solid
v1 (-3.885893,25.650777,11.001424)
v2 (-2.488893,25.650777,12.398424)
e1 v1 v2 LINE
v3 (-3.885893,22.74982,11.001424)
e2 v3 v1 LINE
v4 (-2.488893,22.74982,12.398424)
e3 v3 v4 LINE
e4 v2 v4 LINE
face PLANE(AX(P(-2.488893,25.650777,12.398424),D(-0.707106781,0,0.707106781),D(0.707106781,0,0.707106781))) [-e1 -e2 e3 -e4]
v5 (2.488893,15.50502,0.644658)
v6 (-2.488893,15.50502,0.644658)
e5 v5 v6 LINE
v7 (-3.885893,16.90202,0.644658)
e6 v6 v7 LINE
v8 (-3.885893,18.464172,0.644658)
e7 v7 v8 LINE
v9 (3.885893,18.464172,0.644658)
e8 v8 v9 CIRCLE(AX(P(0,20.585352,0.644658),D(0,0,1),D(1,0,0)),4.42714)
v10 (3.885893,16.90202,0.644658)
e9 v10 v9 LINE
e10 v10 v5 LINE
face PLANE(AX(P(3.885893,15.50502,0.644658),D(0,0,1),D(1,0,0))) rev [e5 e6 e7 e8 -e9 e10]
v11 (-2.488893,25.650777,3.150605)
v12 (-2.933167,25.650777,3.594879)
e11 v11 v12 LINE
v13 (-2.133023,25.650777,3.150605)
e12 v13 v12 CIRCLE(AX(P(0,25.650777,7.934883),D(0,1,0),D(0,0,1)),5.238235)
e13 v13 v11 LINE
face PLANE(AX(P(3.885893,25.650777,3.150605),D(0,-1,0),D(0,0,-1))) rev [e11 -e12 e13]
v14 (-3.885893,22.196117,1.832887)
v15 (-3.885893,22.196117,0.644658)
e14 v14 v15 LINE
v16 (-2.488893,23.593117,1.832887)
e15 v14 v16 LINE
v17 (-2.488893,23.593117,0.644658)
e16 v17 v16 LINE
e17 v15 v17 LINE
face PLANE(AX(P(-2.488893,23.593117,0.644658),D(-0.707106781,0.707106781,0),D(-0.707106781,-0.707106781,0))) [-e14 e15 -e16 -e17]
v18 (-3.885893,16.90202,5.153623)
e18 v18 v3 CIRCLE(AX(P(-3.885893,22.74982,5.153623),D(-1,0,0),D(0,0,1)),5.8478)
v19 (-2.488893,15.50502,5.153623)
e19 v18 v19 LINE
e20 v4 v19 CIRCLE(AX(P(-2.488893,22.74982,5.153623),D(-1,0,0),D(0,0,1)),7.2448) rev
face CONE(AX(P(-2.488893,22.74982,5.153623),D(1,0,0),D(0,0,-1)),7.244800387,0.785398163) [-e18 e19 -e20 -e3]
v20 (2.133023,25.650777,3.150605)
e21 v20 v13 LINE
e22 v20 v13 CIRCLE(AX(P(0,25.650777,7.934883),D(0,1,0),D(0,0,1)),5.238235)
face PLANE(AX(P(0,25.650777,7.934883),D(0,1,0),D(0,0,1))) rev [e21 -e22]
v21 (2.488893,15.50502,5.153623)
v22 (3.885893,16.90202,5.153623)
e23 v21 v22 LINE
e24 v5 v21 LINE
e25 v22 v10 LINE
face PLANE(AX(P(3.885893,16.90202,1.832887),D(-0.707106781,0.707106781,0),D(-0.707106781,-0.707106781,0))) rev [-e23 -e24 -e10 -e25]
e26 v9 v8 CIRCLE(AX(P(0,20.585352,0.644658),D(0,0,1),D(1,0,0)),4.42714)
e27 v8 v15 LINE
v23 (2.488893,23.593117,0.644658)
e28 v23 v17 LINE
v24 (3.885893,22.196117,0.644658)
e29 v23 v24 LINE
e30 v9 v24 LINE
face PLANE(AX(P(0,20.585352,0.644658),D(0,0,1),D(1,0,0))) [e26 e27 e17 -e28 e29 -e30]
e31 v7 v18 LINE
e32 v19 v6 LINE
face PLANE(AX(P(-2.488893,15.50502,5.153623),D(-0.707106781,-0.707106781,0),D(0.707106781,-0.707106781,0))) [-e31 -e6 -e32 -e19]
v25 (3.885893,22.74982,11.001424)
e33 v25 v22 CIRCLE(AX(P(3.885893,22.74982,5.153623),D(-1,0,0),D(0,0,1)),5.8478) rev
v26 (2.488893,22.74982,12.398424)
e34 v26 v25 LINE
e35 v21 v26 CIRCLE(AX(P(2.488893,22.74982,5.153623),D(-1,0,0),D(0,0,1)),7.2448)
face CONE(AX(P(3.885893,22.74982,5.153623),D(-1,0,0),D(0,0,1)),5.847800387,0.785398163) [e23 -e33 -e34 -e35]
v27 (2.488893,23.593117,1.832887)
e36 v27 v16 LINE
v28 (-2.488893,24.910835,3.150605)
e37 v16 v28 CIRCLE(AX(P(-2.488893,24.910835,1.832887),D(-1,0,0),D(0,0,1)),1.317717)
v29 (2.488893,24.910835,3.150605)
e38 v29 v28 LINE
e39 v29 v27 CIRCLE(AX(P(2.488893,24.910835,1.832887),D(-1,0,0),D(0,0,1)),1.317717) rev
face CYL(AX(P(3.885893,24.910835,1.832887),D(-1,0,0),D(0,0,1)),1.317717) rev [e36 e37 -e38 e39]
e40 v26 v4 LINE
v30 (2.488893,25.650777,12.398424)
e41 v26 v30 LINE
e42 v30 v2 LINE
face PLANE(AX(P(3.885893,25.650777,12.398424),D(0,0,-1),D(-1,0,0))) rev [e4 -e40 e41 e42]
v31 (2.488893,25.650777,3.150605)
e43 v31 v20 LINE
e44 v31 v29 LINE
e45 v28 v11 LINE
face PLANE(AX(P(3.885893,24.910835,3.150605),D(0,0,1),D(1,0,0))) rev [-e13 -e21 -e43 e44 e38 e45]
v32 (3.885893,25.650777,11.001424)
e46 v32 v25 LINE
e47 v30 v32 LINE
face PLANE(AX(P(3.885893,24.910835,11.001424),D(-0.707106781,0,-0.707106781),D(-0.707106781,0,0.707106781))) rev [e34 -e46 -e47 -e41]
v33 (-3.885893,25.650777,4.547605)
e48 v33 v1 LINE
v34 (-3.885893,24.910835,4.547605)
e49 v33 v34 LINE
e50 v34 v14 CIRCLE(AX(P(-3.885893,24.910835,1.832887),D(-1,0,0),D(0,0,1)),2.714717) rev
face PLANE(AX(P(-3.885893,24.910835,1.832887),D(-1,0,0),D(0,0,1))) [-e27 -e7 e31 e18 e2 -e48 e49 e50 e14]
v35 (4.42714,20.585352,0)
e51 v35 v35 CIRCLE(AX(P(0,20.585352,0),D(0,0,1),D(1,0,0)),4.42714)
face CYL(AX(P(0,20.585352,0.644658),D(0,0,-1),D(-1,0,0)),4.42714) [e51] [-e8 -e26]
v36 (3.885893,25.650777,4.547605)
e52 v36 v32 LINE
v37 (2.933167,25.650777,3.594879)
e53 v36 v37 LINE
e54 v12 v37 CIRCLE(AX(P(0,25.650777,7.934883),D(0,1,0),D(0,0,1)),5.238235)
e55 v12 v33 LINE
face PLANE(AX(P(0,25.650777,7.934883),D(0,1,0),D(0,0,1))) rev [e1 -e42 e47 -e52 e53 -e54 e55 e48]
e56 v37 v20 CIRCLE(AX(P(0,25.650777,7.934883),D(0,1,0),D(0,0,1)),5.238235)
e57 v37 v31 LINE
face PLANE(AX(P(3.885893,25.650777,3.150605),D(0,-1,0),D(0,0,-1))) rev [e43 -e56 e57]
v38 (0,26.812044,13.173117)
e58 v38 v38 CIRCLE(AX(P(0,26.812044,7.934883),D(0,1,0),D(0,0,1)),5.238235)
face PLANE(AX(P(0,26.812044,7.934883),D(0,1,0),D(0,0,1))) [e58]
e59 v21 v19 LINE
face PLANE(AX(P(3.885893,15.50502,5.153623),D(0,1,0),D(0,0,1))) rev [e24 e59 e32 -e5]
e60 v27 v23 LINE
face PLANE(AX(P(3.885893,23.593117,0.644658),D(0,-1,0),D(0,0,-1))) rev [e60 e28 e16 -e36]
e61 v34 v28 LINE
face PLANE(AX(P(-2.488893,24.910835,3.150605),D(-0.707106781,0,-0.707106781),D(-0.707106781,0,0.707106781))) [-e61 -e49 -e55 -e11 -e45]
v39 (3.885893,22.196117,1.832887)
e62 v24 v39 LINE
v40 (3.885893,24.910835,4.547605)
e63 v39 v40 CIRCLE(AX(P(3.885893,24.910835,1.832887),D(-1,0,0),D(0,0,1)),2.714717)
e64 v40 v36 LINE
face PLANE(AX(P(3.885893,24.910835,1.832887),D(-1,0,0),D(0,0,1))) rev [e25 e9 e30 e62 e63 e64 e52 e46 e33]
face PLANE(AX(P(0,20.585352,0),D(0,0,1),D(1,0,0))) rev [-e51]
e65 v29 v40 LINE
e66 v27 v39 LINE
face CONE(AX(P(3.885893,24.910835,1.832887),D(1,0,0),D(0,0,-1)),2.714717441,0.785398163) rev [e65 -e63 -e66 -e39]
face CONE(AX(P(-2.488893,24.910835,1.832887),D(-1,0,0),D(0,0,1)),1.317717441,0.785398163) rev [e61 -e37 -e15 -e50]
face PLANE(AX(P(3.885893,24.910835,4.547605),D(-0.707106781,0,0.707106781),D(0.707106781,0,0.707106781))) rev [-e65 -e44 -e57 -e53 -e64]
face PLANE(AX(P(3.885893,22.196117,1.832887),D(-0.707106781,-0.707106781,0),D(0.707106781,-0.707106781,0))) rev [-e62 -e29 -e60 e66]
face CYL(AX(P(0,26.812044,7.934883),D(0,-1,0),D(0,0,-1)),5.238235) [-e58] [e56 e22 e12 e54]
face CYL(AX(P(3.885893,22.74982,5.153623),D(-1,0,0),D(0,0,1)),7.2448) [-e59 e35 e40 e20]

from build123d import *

# Parameters (mm, degrees)
SKETCH1_R      = 4.427139884
EXTRUDE1_DEPTH = 0.644658235
EXTRUDE2_DEPTH = 3.885892792
SKETCH3_R      = 5.238234522
EXTRUDE3_DEPTH = 1.161266807
CHAMFER1_SIZE  = 1.397


with BuildPart() as part:
    # Sketch1 → Extrude1 (new body)
    with BuildSketch(Plane.XY):
        with Locations((0, 20.585351579)):
            Circle(SKETCH1_R)
    extrude(amount=EXTRUDE1_DEPTH)

    # Sketch2 → Extrude2 (add, symmetric)
    with BuildSketch(Plane(origin=(0, 0, 0), x_dir=(0, 0, -1), z_dir=(1, 0, 0))):
        with BuildLine():
            Line((-0.644658235, 15.505020105), (-0.644658235, 23.59311727))
            Line((-0.644658235, 23.59311727), (-1.832887116, 23.59311727))
            ThreePointArc((-1.832887116, 23.59311727), (-2.764654054, 23.979067772), (-3.150604557, 24.910834711))
            Line((-3.150604557, 24.910834711), (-3.150604557, 25.650777017))
            Line((-3.150604557, 25.650777017), (-12.398423576, 25.650777017))
            Line((-12.398423576, 25.650777017), (-12.398423576, 22.749820493))
            ThreePointArc((-12.398423576, 22.749820493), (-10.27647067, 17.62697301), (-5.153623188, 15.505020105))
            Line((-5.153623188, 15.505020105), (-0.644658235, 15.505020105))
        make_face()
    extrude(amount=EXTRUDE2_DEPTH, both=True)

    # Sketch3 → Extrude3 (add)
    with BuildSketch(Plane(origin=(0, 25.650777017, 0), x_dir=(1, 0, 0), z_dir=(0, 1, 0))):
        with Locations(Location((0, -7.934882504, 0), (0, 0, 65.970774096))):
            Circle(SKETCH3_R)
    extrude(amount=EXTRUDE3_DEPTH)

    # Chamfer1
    # the kernel refuses this chamfer: 1.397 mm, written as the material it takes off along each edge
    with BuildSketch(Plane(origin=(-3.885892792, 24.910834711, 1.832887116), x_dir=(0, -1, 0), z_dir=(0, 0, -1))) as chamfer1_piece_1:
        Polygon((1.317717441 + CHAMFER1_SIZE, 0), (1.317717441, -CHAMFER1_SIZE), (1.317717441, 0), align=None)
    revolve(axis=Axis((-3.885892792, 24.910834711, 1.832887116), (-1, 0, 0)), revolution_arc=90, mode=Mode.SUBTRACT)
    with BuildSketch(Plane(origin=(-3.885892792, 24.910834711, 3.150604557), x_dir=(-0.027495876610586344, 0, 0.9996219169112966), z_dir=(0, 1, 0))) as chamfer1_piece_2:
        Polygon((CHAMFER1_SIZE * 0.999621916911, CHAMFER1_SIZE * 0.0274958766106), (-CHAMFER1_SIZE * 0.0274958766106, CHAMFER1_SIZE * 0.999621916911), (0, 0), align=None)
    extrude(amount=0.739942306, mode=Mode.SUBTRACT)
    with BuildSketch(Plane(origin=(-3.885892792, 25.650777017, 12.398423576), x_dir=(-0.027495876610586365, 0, -0.9996219169112968), z_dir=(0, -1, 0))) as chamfer1_piece_3:
        Polygon((CHAMFER1_SIZE * 0.999621916911, CHAMFER1_SIZE * 0.0274958766106), (-CHAMFER1_SIZE * 0.0274958766106, CHAMFER1_SIZE * 0.999621916911), (0, 0), align=None)
    extrude(amount=2.900956524, mode=Mode.SUBTRACT)
    with BuildSketch(Plane(origin=(-3.885892792, 22.749820493, 5.153623188), x_dir=(0, 0, 1), z_dir=(0, 1, 0))) as chamfer1_piece_4:
        Polygon((7.244800387 - CHAMFER1_SIZE, 0), (7.244800387, CHAMFER1_SIZE), (7.244800387, 0), align=None)
    revolve(axis=Axis((-3.885892792, 22.749820493, 5.153623188), (1, 0, 0)), revolution_arc=90, mode=Mode.SUBTRACT)
    with BuildSketch(Plane(origin=(3.885892792, 15.505020105, 5.153623188), x_dir=(0.027495876610586393, 0.9996219169112966, 0), z_dir=(0, 0, -1)), Plane(origin=(-3.885892792, 15.505020105, 5.153623188), x_dir=(0.9996219169112968, -0.027495876610586046, 0), z_dir=(0, 0, -1))) as chamfer1_piece_5:
        Polygon((CHAMFER1_SIZE * 0.999621916911, -CHAMFER1_SIZE * 0.0274958766106), (-CHAMFER1_SIZE * 0.0274958766106, -CHAMFER1_SIZE * 0.999621916911), (0, 0), align=None)
    extrude(amount=8.101606087, mode=Mode.SUBTRACT)
    with BuildSketch(Plane(origin=(3.885892792, 23.59311727, 0.644658235), x_dir=(0.027495876610586393, -0.9996219169112966, 0), z_dir=(0, 0, 1))) as chamfer1_piece_6:
        Polygon((CHAMFER1_SIZE * 0.999621916911, -CHAMFER1_SIZE * 0.0274958766106), (-CHAMFER1_SIZE * 0.0274958766106, -CHAMFER1_SIZE * 0.999621916911), (0, 0), align=None)
    extrude(amount=1.188228881, mode=Mode.SUBTRACT)
    with BuildSketch(Plane(origin=(3.885892792, 24.910834711, 1.832887116), x_dir=(0, -1, 0), z_dir=(0, 0, -1))) as chamfer1_piece_7:
        Polygon((1.317717441 + CHAMFER1_SIZE, 0), (1.317717441, CHAMFER1_SIZE), (1.317717441, 0), align=None)
    revolve(axis=Axis((3.885892792, 24.910834711, 1.832887116), (-1, 0, 0)), revolution_arc=90, mode=Mode.SUBTRACT)
    with BuildSketch(Plane(origin=(3.885892792, 24.910834711, 3.150604557), x_dir=(0.027495876610586344, 0, 0.9996219169112966), z_dir=(0, 1, 0))) as chamfer1_piece_8:
        Polygon((CHAMFER1_SIZE * 0.999621916911, -CHAMFER1_SIZE * 0.0274958766106), (-CHAMFER1_SIZE * 0.0274958766106, -CHAMFER1_SIZE * 0.999621916911), (0, 0), align=None)
    extrude(amount=0.739942306, mode=Mode.SUBTRACT)
    with BuildSketch(Plane(origin=(3.885892792, 25.650777017, 12.398423576), x_dir=(0.027495876610586365, 0, -0.9996219169112968), z_dir=(0, -1, 0))) as chamfer1_piece_9:
        Polygon((CHAMFER1_SIZE * 0.999621916911, -CHAMFER1_SIZE * 0.0274958766106), (-CHAMFER1_SIZE * 0.0274958766106, -CHAMFER1_SIZE * 0.999621916911), (0, 0), align=None)
    extrude(amount=2.900956524, mode=Mode.SUBTRACT)
    with BuildSketch(Plane(origin=(3.885892792, 22.749820493, 5.153623188), x_dir=(0, 0, 1), z_dir=(0, 1, 0))) as chamfer1_piece_10:
        Polygon((7.244800387 - CHAMFER1_SIZE, 0), (7.244800387, -CHAMFER1_SIZE), (7.244800387, 0), align=None)
    revolve(axis=Axis((3.885892792, 22.749820493, 5.153623188), (1, 0, 0)), revolution_arc=90, mode=Mode.SUBTRACT)
    with BuildSketch(Plane(origin=(-3.885892792, 23.59311727, 0.644658235), x_dir=(-0.027495876610586393, -0.9996219169112966, 0), z_dir=(0, 0, 1))) as chamfer1_piece_11:
        Polygon((CHAMFER1_SIZE * 0.999621916911, CHAMFER1_SIZE * 0.0274958766106), (-CHAMFER1_SIZE * 0.0274958766106, CHAMFER1_SIZE * 0.999621916911), (0, 0), align=None)
    extrude(amount=1.188228881, mode=Mode.SUBTRACT)


solid = part.part
